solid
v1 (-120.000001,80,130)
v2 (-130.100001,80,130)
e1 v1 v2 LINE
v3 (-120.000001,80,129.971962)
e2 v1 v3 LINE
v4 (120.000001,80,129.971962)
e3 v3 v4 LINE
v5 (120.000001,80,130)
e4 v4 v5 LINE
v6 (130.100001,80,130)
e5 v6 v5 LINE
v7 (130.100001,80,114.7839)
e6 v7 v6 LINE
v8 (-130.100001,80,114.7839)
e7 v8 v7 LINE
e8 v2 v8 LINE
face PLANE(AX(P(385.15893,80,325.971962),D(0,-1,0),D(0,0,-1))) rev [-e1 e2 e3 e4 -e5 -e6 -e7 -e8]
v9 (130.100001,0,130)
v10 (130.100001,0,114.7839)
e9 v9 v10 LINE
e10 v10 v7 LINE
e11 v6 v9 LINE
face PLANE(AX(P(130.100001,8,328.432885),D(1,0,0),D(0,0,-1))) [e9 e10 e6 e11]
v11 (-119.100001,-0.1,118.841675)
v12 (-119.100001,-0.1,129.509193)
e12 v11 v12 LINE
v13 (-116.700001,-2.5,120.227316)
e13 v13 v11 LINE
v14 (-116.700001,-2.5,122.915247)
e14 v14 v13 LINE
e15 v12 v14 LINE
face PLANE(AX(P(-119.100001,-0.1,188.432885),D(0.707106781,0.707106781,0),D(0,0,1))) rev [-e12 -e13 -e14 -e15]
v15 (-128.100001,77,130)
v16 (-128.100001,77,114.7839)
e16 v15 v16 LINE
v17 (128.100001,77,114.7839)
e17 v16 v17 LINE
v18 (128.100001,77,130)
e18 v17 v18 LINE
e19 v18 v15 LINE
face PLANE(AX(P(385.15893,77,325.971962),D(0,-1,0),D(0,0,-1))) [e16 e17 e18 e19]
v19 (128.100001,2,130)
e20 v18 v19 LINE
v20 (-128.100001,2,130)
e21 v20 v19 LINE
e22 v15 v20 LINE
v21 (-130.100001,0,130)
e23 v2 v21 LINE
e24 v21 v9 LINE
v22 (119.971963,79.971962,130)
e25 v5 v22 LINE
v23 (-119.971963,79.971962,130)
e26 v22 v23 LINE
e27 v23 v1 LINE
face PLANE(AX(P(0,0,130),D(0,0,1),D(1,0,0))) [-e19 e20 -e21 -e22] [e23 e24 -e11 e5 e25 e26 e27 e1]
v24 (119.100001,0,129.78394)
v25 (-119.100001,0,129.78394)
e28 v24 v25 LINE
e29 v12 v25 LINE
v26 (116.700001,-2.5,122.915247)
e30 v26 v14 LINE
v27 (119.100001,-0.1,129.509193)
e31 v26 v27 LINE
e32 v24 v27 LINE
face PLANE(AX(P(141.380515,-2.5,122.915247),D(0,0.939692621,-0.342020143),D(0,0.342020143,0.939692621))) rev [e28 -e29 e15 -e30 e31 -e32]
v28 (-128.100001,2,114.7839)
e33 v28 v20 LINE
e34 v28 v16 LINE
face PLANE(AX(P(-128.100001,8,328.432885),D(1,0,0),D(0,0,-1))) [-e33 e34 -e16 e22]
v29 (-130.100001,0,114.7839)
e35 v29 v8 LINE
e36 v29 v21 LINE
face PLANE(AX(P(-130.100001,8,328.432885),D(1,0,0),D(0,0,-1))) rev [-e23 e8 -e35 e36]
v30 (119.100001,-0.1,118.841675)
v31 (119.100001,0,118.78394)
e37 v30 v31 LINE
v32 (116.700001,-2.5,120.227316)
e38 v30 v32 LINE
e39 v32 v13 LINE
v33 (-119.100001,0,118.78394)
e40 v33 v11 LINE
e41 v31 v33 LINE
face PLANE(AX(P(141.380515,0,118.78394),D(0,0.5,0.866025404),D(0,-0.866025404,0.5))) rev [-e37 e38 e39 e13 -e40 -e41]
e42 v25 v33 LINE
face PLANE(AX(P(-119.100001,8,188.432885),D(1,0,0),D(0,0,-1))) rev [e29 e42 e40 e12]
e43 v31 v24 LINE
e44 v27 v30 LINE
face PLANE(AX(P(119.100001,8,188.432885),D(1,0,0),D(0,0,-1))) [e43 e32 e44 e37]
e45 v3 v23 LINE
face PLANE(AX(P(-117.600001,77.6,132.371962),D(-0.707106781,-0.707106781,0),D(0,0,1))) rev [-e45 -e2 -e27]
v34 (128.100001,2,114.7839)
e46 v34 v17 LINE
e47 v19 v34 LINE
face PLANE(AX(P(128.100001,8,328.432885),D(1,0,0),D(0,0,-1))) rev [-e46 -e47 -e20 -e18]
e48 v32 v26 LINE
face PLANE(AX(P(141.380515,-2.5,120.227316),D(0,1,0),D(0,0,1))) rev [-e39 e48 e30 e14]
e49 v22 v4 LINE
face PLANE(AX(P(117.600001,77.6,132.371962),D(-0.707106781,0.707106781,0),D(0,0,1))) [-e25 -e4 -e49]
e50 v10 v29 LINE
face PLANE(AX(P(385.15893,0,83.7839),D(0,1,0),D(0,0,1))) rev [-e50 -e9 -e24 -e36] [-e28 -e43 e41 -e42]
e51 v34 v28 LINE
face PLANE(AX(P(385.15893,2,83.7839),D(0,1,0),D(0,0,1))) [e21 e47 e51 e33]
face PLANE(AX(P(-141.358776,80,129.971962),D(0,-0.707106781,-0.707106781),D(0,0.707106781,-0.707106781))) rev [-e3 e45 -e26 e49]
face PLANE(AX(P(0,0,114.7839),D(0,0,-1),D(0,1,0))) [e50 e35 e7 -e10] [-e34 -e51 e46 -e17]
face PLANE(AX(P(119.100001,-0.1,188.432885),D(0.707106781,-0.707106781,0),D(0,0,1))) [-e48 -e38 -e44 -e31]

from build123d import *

# Parameters (mm, degrees)
BOSS_EXTRUDE1_DEPTH                 = 130.100001
BOSS_EXTRUDE1_DEPTH_BACK            = 130.100001
SHELL1_START                        = 85.7839
SHELL1_OUTLINE_W                    = 256.200002558
SHELL1_OUTLINE_H                    = 75
SHELL1_DEPTH                        = 240.188061984
BACK_CORNER_CHAMS_SIZE              = 3
LATCH_RIB_DEPTH                     = 119.100001
LATCH_RIB_CHAMFER_SIZE              = 2.4
LPATTERN1_COUNT                     = 6
LPATTERN1_PITCH                     = 35
LATCH_RIB_CHAMFER_OF_LPATTERN1_SIZE = 2.4
STACKER_LATCH_SLOT_DEPTH            = 120.100001
STACKER_LATCH_SLOT_CHAMFER_SIZE     = 2.5
SKETCH6_W                           = 311.302660761
SKETCH6_H                           = 137.717887742
CUT_EXTRUDE1_DEPTH                  = 31
SKETCH7_W                           = 311.302660761
SKETCH7_H                           = 137.717887742
CUT_EXTRUDE2_DEPTH                  = 249.457280353


with BuildPart() as part:
    # Sketch1 → Boss-Extrude1 (new, two sides: drawn at the far end of the back side and taken through both)
    with BuildSketch(Plane(origin=(0, 0, 0), x_dir=(0, 0, -1), z_dir=(1, 0, 0)).offset(-BOSS_EXTRUDE1_DEPTH_BACK)):
        Polygon((-83.7839, 0), (-279.783940449, 0), (-325.971961984, 80), (-83.7839, 80), align=None)
    extrude(amount=BOSS_EXTRUDE1_DEPTH + BOSS_EXTRUDE1_DEPTH_BACK)

    # Shell1: read off the stored shape, not the designer's step
    # Shell1 outline → Shell1 (cut)
    with BuildSketch(Plane.XY.offset(SHELL1_START)):
        with Locations((0, 39.5)):
            Rectangle(SHELL1_OUTLINE_W, SHELL1_OUTLINE_H)
    extrude(amount=SHELL1_DEPTH, mode=Mode.SUBTRACT)

    # Back Corner Chams
    back_corner_chams_edges = [part.edges().sort_by_distance(p)[0] for p in [
        (-130.100001, 40, 83.7839),
        (130.100001, 40, 83.7839),
    ]]
    chamfer(back_corner_chams_edges, length=BACK_CORNER_CHAMS_SIZE)

    # Sketch2 → Latch Rib (add, symmetric)
    with BuildSketch(Plane(origin=(0, 0, 0), x_dir=(0, 0, -1), z_dir=(1, 0, 0))):
        Polygon((-258.783940449, 0), (-260.227316122, -2.5), (-262.915246901, -2.5), (-269.783940449, 0), align=None)
    latch_rib = extrude(amount=LATCH_RIB_DEPTH, both=True)

    # Latch Rib Chamfer
    latch_rib_chamfer_edges = [part.edges().sort_by_distance(p)[0] for p in [
        (119.100001, -2.5, 261.571281511),
        (-119.100001, -2.5, 261.571281511),
    ]]
    chamfer(latch_rib_chamfer_edges, length=LATCH_RIB_CHAMFER_SIZE)

    # LPattern1: Latch Rib ×6
    with Locations(*[(0, 0, -i * LPATTERN1_PITCH) for i in range(1, LPATTERN1_COUNT)]):
        add(latch_rib)

    # Latch Rib Chamfer of LPattern1
    latch_rib_chamfer_of_lpattern1_edges = [part.edges().sort_by_distance(p)[0] for p in [
        (119.100001, -2.5, 226.571281511),
        (-119.100001, -2.5, 226.571281511),
        (119.100001, -2.5, 191.571281511),
        (-119.100001, -2.5, 191.571281511),
        (119.100001, -2.5, 156.571281511),
        (-119.100001, -2.5, 156.571281511),
        (119.100001, -2.5, 121.571281511),
        (-119.100001, -2.5, 121.571281511),
        (119.100001, -2.5, 86.571281511),
        (-119.100001, -2.5, 86.571281511),
    ]]
    chamfer(latch_rib_chamfer_of_lpattern1_edges, length=LATCH_RIB_CHAMFER_OF_LPATTERN1_SIZE)

    # Sketch3 → Stacker Latch Slot (cut, symmetric)
    with BuildSketch(Plane(origin=(0, 0, 0), x_dir=(0, 0, -1), z_dir=(1, 0, 0))):
        Polygon((-315.971961984, 80), (-304.971961984, 80), (-307.371961984, 77.6), (-309.378016178, 77.6), align=None)
    extrude(amount=STACKER_LATCH_SLOT_DEPTH, both=True, mode=Mode.SUBTRACT)

    # Stacker Latch Slot Chamfer
    # the kernel refuses this chamfer: 2.5 mm, written as the material it adds along each edge
    with BuildSketch(Plane(origin=(120.100001, 77.6, 300.942754515), x_dir=(0, 1, 0), z_dir=(0, 0, 1))) as stacker_latch_slot_chamfer_piece_1_section:
        Polygon((STACKER_LATCH_SLOT_CHAMFER_SIZE, 0), (0, STACKER_LATCH_SLOT_CHAMFER_SIZE), (0, 0), align=None)
    stacker_latch_slot_chamfer_piece_1 = extrude(amount=19.364914362, mode=Mode.PRIVATE)
    stacker_latch_slot_chamfer_piece_1 = split(stacker_latch_slot_chamfer_piece_1, bisect_by=Plane(origin=(120.100001, 80, 300.942754515), z_dir=(0, -1, 0)), keep=Keep.TOP, mode=Mode.PRIVATE)
    add(stacker_latch_slot_chamfer_piece_1)
    with BuildSketch(Plane(origin=(-120.100001, 77.6, 300.942754515), x_dir=(0, 1, 0), z_dir=(0, 0, 1))) as stacker_latch_slot_chamfer_piece_2_section:
        Polygon((STACKER_LATCH_SLOT_CHAMFER_SIZE, 0), (0, -STACKER_LATCH_SLOT_CHAMFER_SIZE), (0, 0), align=None)
    stacker_latch_slot_chamfer_piece_2 = extrude(amount=19.364914362, mode=Mode.PRIVATE)
    stacker_latch_slot_chamfer_piece_2 = split(stacker_latch_slot_chamfer_piece_2, bisect_by=Plane(origin=(-120.100001, 80, 300.942754515), z_dir=(0, -1, 0)), keep=Keep.TOP, mode=Mode.PRIVATE)
    add(stacker_latch_slot_chamfer_piece_2)

    # LPattern2: read off the stored shape, not the designer's step
    # LPattern2: loft between two sections, ruled curve by curve
    lpattern2_from = [
        Edge.make_line((120.000001279, 80, 105.971961984), (120.000001279, 80, 94.971961984)),
        Edge.make_line((-120.000001279, 80, 94.971961984), (-120.000001279, 80, 105.971961984)),
        Edge.make_line((-120.000001279, 80, 105.971961984), (120.000001279, 80, 105.971961984)),
        Edge.make_line((120.000001279, 80, 94.971961984), (-120.000001279, 80, 94.971961984)),
    ]
    lpattern2_to = [
        Edge.make_line((117.600001279, 77.6, 99.378016178), (117.600001279, 77.6, 97.371961984)),
        Edge.make_line((-117.600001279, 77.6, 97.371961984), (-117.600001279, 77.6, 99.378016178)),
        Edge.make_line((-117.600001279, 77.6, 99.378016178), (117.600001279, 77.6, 99.378016178)),
        Edge.make_line((117.600001279, 77.6, 97.371961984), (-117.600001279, 77.6, 97.371961984)),
    ]
    lpattern2 = Solid(Shell([*[Face.make_surface_from_curves(lpattern2_from[k], lpattern2_to[k]) for k in range(4)], Face(Wire(lpattern2_from)), Face(Wire(lpattern2_to))]))
    add(lpattern2, mode=Mode.SUBTRACT)

    # LPattern2 2: loft between two sections, ruled curve by curve
    lpattern2_2_from = [
        Edge.make_line((120.000001279, 80, 140.971961984), (120.000001279, 80, 129.971961984)),
        Edge.make_line((-120.000001279, 80, 129.971961984), (-120.000001279, 80, 140.971961984)),
        Edge.make_line((-120.000001279, 80, 140.971961984), (120.000001279, 80, 140.971961984)),
        Edge.make_line((120.000001279, 80, 129.971961984), (-120.000001279, 80, 129.971961984)),
    ]
    lpattern2_2_to = [
        Edge.make_line((117.600001279, 77.6, 134.378016178), (117.600001279, 77.6, 132.371961984)),
        Edge.make_line((-117.600001279, 77.6, 132.371961984), (-117.600001279, 77.6, 134.378016178)),
        Edge.make_line((-117.600001279, 77.6, 134.378016178), (117.600001279, 77.6, 134.378016178)),
        Edge.make_line((117.600001279, 77.6, 132.371961984), (-117.600001279, 77.6, 132.371961984)),
    ]
    lpattern2_2 = Solid(Shell([*[Face.make_surface_from_curves(lpattern2_2_from[k], lpattern2_2_to[k]) for k in range(4)], Face(Wire(lpattern2_2_from)), Face(Wire(lpattern2_2_to))]))
    add(lpattern2_2, mode=Mode.SUBTRACT)

    # LPattern2 3: loft between two sections, ruled curve by curve
    lpattern2_3_from = [
        Edge.make_line((120.000001279, 80, 175.971961984), (120.000001279, 80, 164.971961984)),
        Edge.make_line((-120.000001279, 80, 164.971961984), (-120.000001279, 80, 175.971961984)),
        Edge.make_line((-120.000001279, 80, 175.971961984), (120.000001279, 80, 175.971961984)),
        Edge.make_line((120.000001279, 80, 164.971961984), (-120.000001279, 80, 164.971961984)),
    ]
    lpattern2_3_to = [
        Edge.make_line((117.600001279, 77.6, 169.378016178), (117.600001279, 77.6, 167.371961984)),
        Edge.make_line((-117.600001279, 77.6, 167.371961984), (-117.600001279, 77.6, 169.378016178)),
        Edge.make_line((-117.600001279, 77.6, 169.378016178), (117.600001279, 77.6, 169.378016178)),
        Edge.make_line((117.600001279, 77.6, 167.371961984), (-117.600001279, 77.6, 167.371961984)),
    ]
    lpattern2_3 = Solid(Shell([*[Face.make_surface_from_curves(lpattern2_3_from[k], lpattern2_3_to[k]) for k in range(4)], Face(Wire(lpattern2_3_from)), Face(Wire(lpattern2_3_to))]))
    add(lpattern2_3, mode=Mode.SUBTRACT)

    # LPattern2 4: loft between two sections, ruled curve by curve
    lpattern2_4_from = [
        Edge.make_line((120.000001279, 80, 210.971961984), (120.000001279, 80, 199.971961984)),
        Edge.make_line((-120.000001279, 80, 199.971961984), (-120.000001279, 80, 210.971961984)),
        Edge.make_line((-120.000001279, 80, 210.971961984), (120.000001279, 80, 210.971961984)),
        Edge.make_line((120.000001279, 80, 199.971961984), (-120.000001279, 80, 199.971961984)),
    ]
    lpattern2_4_to = [
        Edge.make_line((117.600001279, 77.6, 204.378016178), (117.600001279, 77.6, 202.371961984)),
        Edge.make_line((-117.600001279, 77.6, 202.371961984), (-117.600001279, 77.6, 204.378016178)),
        Edge.make_line((-117.600001279, 77.6, 204.378016178), (117.600001279, 77.6, 204.378016178)),
        Edge.make_line((117.600001279, 77.6, 202.371961984), (-117.600001279, 77.6, 202.371961984)),
    ]
    lpattern2_4 = Solid(Shell([*[Face.make_surface_from_curves(lpattern2_4_from[k], lpattern2_4_to[k]) for k in range(4)], Face(Wire(lpattern2_4_from)), Face(Wire(lpattern2_4_to))]))
    add(lpattern2_4, mode=Mode.SUBTRACT)

    # LPattern2 5: loft between two sections, ruled curve by curve
    lpattern2_5_from = [
        Edge.make_line((120.000001279, 80, 245.971961984), (120.000001279, 80, 234.971961984)),
        Edge.make_line((-120.000001279, 80, 234.971961984), (-120.000001279, 80, 245.971961984)),
        Edge.make_line((-120.000001279, 80, 245.971961984), (120.000001279, 80, 245.971961984)),
        Edge.make_line((120.000001279, 80, 234.971961984), (-120.000001279, 80, 234.971961984)),
    ]
    lpattern2_5_to = [
        Edge.make_line((117.600001279, 77.6, 239.378016178), (117.600001279, 77.6, 237.371961984)),
        Edge.make_line((-117.600001279, 77.6, 237.371961984), (-117.600001279, 77.6, 239.378016178)),
        Edge.make_line((-117.600001279, 77.6, 239.378016178), (117.600001279, 77.6, 239.378016178)),
        Edge.make_line((117.600001279, 77.6, 237.371961984), (-117.600001279, 77.6, 237.371961984)),
    ]
    lpattern2_5 = Solid(Shell([*[Face.make_surface_from_curves(lpattern2_5_from[k], lpattern2_5_to[k]) for k in range(4)], Face(Wire(lpattern2_5_from)), Face(Wire(lpattern2_5_to))]))
    add(lpattern2_5, mode=Mode.SUBTRACT)

    # LPattern2 6: loft between two sections, ruled curve by curve
    lpattern2_6_from = [
        Edge.make_line((120.000001279, 80, 280.971961984), (120.000001279, 80, 269.971961984)),
        Edge.make_line((-120.000001279, 80, 269.971961984), (-120.000001279, 80, 280.971961984)),
        Edge.make_line((-120.000001279, 80, 280.971961984), (120.000001279, 80, 280.971961984)),
        Edge.make_line((120.000001279, 80, 269.971961984), (-120.000001279, 80, 269.971961984)),
    ]
    lpattern2_6_to = [
        Edge.make_line((117.600001279, 77.6, 274.378016178), (117.600001279, 77.6, 272.371961984)),
        Edge.make_line((-117.600001279, 77.6, 272.371961984), (-117.600001279, 77.6, 274.378016178)),
        Edge.make_line((-117.600001279, 77.6, 274.378016178), (117.600001279, 77.6, 274.378016178)),
        Edge.make_line((117.600001279, 77.6, 272.371961984), (-117.600001279, 77.6, 272.371961984)),
    ]
    lpattern2_6 = Solid(Shell([*[Face.make_surface_from_curves(lpattern2_6_from[k], lpattern2_6_to[k]) for k in range(4)], Face(Wire(lpattern2_6_from)), Face(Wire(lpattern2_6_to))]))
    add(lpattern2_6, mode=Mode.SUBTRACT)

    # Sketch6 → Cut-Extrude1 (cut)
    with BuildSketch(Plane(origin=(0, 0, 83.7839), x_dir=(-1, 0, 0), z_dir=(0, 0, -1))):
        with Locations((1.437413341, 38.133965711)):
            Rectangle(SKETCH6_W, SKETCH6_H)
    extrude(amount=-CUT_EXTRUDE1_DEPTH, mode=Mode.SUBTRACT)

    # Sketch7 → Cut-Extrude2 (cut, through all)
    with BuildSketch(Plane.XY.offset(130)):
        with Locations((-1.437413341, 38.133965711)):
            Rectangle(SKETCH7_W, SKETCH7_H)
    extrude(amount=CUT_EXTRUDE2_DEPTH, mode=Mode.SUBTRACT)


solid = part.part
